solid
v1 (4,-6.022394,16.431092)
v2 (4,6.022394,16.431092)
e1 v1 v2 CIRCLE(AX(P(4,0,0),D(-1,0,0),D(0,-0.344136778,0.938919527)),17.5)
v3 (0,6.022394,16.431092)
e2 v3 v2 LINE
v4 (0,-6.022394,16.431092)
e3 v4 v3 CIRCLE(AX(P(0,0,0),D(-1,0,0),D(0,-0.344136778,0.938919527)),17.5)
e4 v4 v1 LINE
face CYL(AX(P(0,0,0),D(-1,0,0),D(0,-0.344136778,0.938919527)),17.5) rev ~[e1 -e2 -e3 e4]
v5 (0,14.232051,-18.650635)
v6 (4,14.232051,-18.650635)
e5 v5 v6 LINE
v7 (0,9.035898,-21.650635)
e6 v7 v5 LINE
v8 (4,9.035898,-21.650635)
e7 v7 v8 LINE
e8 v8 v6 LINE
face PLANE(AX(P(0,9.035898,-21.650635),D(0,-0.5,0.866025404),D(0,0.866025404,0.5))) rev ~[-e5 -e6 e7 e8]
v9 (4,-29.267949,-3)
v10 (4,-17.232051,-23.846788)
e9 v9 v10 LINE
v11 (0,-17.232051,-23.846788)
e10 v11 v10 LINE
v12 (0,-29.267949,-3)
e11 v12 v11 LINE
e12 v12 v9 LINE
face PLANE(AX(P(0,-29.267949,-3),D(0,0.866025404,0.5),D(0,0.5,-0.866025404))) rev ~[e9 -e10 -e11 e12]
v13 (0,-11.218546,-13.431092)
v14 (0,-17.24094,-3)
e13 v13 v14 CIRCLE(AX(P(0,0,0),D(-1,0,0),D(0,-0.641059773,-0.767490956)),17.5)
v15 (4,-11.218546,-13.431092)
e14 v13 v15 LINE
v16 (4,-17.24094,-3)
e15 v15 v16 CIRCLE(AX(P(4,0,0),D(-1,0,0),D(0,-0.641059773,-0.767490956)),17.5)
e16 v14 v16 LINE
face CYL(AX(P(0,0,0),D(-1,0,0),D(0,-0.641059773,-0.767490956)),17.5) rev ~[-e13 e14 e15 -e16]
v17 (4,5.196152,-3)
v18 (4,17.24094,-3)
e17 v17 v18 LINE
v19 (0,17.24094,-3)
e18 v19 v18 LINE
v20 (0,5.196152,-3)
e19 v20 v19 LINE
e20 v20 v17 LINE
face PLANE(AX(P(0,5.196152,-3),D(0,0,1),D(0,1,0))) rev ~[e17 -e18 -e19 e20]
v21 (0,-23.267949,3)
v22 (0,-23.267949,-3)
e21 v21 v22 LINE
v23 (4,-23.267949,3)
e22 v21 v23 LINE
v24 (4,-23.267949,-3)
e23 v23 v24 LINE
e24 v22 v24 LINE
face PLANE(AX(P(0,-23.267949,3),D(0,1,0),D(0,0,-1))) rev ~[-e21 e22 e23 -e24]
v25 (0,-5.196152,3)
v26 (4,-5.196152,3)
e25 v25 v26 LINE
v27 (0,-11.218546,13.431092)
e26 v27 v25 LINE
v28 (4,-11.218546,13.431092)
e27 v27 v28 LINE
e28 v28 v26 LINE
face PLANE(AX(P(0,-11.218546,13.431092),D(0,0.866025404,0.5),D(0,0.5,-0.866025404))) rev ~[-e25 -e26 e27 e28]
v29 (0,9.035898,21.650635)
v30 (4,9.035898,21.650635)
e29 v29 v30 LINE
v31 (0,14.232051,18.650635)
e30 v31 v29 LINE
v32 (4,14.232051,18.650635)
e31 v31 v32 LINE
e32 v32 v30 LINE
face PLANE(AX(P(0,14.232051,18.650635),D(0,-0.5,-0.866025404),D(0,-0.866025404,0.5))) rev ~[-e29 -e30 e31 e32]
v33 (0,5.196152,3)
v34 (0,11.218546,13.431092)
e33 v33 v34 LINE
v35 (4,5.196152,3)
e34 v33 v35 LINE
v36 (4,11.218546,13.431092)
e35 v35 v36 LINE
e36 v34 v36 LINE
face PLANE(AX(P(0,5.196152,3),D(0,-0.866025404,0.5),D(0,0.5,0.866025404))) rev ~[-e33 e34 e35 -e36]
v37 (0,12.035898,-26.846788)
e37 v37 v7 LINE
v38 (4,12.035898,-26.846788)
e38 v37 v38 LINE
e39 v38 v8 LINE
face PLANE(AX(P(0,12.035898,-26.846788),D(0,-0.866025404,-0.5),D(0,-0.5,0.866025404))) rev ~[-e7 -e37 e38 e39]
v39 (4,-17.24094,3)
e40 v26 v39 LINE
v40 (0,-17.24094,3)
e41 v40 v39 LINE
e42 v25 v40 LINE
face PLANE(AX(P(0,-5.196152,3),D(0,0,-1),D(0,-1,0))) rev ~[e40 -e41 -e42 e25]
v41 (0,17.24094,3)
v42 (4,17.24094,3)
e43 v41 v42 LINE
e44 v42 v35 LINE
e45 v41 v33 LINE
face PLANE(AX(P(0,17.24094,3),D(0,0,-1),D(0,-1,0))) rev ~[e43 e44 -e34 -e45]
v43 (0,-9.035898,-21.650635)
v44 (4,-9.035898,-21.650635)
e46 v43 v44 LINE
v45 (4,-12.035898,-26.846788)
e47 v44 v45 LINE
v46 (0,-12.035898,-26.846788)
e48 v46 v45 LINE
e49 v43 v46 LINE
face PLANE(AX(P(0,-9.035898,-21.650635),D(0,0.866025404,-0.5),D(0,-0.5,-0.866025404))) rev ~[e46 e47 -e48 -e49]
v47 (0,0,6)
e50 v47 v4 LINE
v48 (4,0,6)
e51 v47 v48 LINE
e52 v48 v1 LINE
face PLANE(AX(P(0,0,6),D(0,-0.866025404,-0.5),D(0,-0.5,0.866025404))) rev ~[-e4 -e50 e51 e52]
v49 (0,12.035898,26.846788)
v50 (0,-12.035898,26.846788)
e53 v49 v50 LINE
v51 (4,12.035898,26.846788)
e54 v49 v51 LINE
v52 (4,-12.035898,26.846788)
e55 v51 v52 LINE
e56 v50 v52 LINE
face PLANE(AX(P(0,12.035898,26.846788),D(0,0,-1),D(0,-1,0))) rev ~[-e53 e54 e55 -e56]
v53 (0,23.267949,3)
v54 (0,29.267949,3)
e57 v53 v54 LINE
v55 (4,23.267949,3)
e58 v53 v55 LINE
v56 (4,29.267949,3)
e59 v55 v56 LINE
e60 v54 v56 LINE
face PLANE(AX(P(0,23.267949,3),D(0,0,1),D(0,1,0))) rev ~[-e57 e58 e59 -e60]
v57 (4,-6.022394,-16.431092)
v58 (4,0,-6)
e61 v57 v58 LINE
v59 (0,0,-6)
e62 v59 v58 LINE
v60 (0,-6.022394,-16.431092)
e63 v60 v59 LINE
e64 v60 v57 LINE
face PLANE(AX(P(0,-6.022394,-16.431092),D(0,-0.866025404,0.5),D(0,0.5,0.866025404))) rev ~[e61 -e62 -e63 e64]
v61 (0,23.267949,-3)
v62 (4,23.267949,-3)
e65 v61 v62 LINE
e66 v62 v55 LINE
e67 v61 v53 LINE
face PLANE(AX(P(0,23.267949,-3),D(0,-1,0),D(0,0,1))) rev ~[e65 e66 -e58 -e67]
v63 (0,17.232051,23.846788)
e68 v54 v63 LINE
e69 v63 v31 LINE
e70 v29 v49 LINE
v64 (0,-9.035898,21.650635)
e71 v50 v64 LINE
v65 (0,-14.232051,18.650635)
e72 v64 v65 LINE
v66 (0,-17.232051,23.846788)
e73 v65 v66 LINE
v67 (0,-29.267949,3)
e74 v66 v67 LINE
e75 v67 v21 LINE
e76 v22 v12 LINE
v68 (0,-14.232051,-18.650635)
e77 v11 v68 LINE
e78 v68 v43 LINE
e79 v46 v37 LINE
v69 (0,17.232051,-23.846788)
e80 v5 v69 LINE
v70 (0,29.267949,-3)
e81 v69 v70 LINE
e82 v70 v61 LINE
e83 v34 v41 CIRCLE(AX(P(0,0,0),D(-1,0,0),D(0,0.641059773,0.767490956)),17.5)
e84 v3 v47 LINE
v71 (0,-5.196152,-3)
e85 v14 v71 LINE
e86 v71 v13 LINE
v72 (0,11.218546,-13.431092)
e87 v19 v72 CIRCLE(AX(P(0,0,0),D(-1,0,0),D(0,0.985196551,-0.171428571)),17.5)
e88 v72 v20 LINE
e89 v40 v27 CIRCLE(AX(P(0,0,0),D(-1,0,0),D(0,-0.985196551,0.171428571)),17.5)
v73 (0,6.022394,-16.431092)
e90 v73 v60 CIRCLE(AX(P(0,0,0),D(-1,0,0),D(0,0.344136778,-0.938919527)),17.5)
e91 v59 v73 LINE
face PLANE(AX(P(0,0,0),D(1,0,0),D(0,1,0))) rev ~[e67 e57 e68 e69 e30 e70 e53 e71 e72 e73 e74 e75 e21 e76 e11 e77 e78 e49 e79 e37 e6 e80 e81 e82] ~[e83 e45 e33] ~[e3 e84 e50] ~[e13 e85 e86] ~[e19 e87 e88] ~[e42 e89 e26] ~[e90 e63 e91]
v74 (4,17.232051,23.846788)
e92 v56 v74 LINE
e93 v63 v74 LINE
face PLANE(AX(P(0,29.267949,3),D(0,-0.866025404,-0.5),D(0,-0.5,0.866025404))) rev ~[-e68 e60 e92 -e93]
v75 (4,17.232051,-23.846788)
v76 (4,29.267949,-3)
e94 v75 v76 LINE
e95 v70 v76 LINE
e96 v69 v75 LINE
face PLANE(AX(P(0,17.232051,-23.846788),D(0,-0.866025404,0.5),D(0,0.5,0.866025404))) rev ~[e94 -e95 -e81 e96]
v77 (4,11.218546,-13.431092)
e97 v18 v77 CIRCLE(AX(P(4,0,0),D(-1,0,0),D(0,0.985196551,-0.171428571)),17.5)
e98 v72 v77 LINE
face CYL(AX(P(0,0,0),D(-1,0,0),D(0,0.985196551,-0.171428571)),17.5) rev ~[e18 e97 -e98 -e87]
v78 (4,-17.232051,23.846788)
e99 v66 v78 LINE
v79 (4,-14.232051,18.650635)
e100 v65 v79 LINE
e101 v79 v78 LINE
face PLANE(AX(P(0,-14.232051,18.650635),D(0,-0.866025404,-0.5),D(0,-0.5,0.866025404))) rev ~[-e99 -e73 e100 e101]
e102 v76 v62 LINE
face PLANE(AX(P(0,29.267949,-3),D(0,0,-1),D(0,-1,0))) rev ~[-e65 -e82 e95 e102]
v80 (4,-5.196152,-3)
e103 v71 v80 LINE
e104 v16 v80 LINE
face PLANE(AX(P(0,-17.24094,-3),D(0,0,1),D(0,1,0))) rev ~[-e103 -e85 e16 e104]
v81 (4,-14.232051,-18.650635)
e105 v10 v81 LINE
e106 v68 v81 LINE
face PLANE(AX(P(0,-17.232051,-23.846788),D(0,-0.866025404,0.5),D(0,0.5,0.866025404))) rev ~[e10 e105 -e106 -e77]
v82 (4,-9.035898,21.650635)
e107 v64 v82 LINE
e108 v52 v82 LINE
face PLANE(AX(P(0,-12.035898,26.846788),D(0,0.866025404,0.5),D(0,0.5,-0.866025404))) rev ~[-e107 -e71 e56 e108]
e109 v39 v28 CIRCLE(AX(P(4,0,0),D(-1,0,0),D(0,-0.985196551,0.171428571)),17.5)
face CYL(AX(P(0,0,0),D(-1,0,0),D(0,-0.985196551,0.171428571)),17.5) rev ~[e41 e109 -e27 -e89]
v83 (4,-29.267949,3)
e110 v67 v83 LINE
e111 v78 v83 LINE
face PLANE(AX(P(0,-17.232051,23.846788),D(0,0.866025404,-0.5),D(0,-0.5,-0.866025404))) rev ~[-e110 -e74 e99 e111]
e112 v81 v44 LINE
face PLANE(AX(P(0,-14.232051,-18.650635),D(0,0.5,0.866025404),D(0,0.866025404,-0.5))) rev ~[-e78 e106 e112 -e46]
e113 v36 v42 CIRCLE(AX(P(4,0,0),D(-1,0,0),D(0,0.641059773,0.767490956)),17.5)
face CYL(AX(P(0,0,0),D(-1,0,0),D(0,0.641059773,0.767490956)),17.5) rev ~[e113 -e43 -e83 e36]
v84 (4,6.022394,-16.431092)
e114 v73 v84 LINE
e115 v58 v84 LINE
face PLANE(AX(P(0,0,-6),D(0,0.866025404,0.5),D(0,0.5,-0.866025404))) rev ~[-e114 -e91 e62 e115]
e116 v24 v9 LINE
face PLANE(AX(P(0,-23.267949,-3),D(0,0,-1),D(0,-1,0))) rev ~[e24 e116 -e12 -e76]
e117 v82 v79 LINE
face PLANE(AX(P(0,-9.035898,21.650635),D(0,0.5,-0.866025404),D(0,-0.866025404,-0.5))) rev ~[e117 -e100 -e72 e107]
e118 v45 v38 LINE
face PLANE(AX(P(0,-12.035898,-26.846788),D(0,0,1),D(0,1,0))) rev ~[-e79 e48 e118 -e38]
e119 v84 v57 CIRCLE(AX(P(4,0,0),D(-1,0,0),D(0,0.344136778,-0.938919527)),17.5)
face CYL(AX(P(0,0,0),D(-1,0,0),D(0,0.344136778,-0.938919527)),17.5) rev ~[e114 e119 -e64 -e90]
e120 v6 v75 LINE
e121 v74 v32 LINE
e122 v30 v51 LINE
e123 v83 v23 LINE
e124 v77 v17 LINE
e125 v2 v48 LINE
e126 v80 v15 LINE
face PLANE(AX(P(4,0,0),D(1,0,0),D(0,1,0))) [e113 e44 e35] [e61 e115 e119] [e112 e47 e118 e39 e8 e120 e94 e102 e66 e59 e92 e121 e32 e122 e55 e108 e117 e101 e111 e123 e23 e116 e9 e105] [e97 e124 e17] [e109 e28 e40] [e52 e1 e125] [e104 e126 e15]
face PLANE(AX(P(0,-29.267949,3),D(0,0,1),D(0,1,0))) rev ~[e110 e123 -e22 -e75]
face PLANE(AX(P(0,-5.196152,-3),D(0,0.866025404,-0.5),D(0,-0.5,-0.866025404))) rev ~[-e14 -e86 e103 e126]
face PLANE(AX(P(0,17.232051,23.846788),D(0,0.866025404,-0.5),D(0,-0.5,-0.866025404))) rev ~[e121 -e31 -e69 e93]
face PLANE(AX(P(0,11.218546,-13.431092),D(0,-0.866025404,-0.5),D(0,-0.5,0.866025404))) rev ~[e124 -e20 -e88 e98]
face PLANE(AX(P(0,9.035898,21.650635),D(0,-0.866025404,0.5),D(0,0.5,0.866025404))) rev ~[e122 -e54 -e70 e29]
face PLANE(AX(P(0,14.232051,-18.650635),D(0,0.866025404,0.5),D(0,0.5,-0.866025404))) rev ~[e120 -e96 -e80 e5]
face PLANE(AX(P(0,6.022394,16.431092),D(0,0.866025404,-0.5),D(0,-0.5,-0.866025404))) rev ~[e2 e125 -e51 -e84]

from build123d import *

# Parameters (mm, degrees)
F1_DEPTH = 4


with BuildPart() as f1:
    # F0 (on Right) → F1 (new body)
    with BuildSketch(Plane.YZ):
        Polygon((17.2320508076, -23.8467875173), (29.2679491924, -3), (23.2679491924, -3), (23.2679491924, 3), (29.2679491924, 3), (17.2320508076, 23.8467875173), (14.2320508076, 18.6506350946), (9.0358983849, 21.6506350946), (12.0358983849, 26.8467875173), (-12.0358983849, 26.8467875173), (-9.0358983849, 21.6506350946), (-14.2320508076, 18.6506350946), (-17.2320508076, 23.8467875173), (-29.2679491924, 3), (-23.2679491924, 3), (-23.2679491924, -3), (-29.2679491924, -3), (-17.2320508076, -23.8467875173), (-14.2320508076, -18.6506350946), (-9.0358983849, -21.6506350946), (-12.0358983849, -26.8467875173), (12.0358983849, -26.8467875173), (9.0358983849, -21.6506350946), (14.2320508076, -18.6506350946), align=None)
        with BuildLine():
            ThreePointArc((17.2409396496, 3), (17.4351146235, 1.5055823014), (17.5, 0))
            ThreePointArc((17.5, 0), (17.4351146235, -1.5055823014), (17.2409396496, -3))
            ThreePointArc((17.2409396496, -3), (15.1554445662, -8.75), (11.2185460361, -13.4310917216))
            ThreePointArc((11.2185460361, -13.4310917216), (8.75, -15.1554445662), (6.0223936134, -16.4310917216))
            ThreePointArc((6.0223936134, -16.4310917216), (0, -17.5), (-6.0223936134, -16.4310917216))
            ThreePointArc((-6.0223936134, -16.4310917216), (-8.75, -15.1554445662), (-11.2185460361, -13.4310917216))
            ThreePointArc((-11.2185460361, -13.4310917216), (-15.1554445662, -8.75), (-17.2409396496, -3))
            ThreePointArc((-17.2409396496, -3), (-17.5, 0), (-17.2409396496, 3))
            ThreePointArc((-17.2409396496, 3), (-15.1554445662, 8.75), (-11.2185460361, 13.4310917216))
            ThreePointArc((-11.2185460361, 13.4310917216), (-8.75, 15.1554445662), (-6.0223936134, 16.4310917216))
            ThreePointArc((-6.0223936134, 16.4310917216), (0, 17.5), (6.0223936134, 16.4310917216))
            ThreePointArc((6.0223936134, 16.4310917216), (8.75, 15.1554445662), (11.2185460361, 13.4310917216))
            ThreePointArc((11.2185460361, 13.4310917216), (15.1554445662, 8.75), (17.2409396496, 3))
        make_face(mode=Mode.SUBTRACT)
        with BuildLine():
            ThreePointArc((17.2409396496, -3), (17.4351146235, -1.5055823014), (17.5, 0))
            ThreePointArc((17.5, 0), (17.4351146235, 1.5055823014), (17.2409396496, 3))
            Line((17.2409396496, 3), (5.1961524227, 3))
            Line((5.1961524227, 3), (3.4641016151, 0))
            Line((3.4641016151, 0), (5.1961524227, -3))
            Line((5.1961524227, -3), (17.2409396496, -3))
        make_face()
        with BuildLine():
            Line((5.1961524227, 3), (11.2185460361, 13.4310917216))
            ThreePointArc((11.2185460361, 13.4310917216), (8.75, 15.1554445662), (6.0223936134, 16.4310917216))
            Line((6.0223936134, 16.4310917216), (0, 6))
            Line((0, 6), (1.7320508076, 3))
            Line((1.7320508076, 3), (5.1961524227, 3))
        make_face()
        Polygon((3.4641016151, 0), (5.1961524227, 3), (1.7320508076, 3), align=None)
        with BuildLine():
            ThreePointArc((6.0223936134, -16.4310917216), (8.75, -15.1554445662), (11.2185460361, -13.4310917216))
            Line((11.2185460361, -13.4310917216), (5.1961524227, -3))
            Line((5.1961524227, -3), (1.7320508076, -3))
            Line((1.7320508076, -3), (0, -6))
            Line((0, -6), (6.0223936134, -16.4310917216))
        make_face()
        Polygon((1.7320508076, -3), (5.1961524227, -3), (3.4641016151, 0), align=None)
        Polygon((-1.7320508076, 3), (1.7320508076, 3), (0, 6), align=None)
        Polygon((3.4641016151, 0), (1.7320508076, 3), (-1.7320508076, 3), (-3.4641016151, 0), (-1.7320508076, -3), (1.7320508076, -3), align=None)
        Polygon((0, -6), (1.7320508076, -3), (-1.7320508076, -3), align=None)
        with BuildLine():
            Line((0, 6), (-6.0223936134, 16.4310917216))
            ThreePointArc((-6.0223936134, 16.4310917216), (-8.75, 15.1554445662), (-11.2185460361, 13.4310917216))
            Line((-11.2185460361, 13.4310917216), (-5.1961524227, 3))
            Line((-5.1961524227, 3), (-1.7320508076, 3))
            Line((-1.7320508076, 3), (0, 6))
        make_face()
        Polygon((-3.4641016151, 0), (-1.7320508076, 3), (-5.1961524227, 3), align=None)
        with BuildLine():
            ThreePointArc((-11.2185460361, -13.4310917216), (-8.75, -15.1554445662), (-6.0223936134, -16.4310917216))
            Line((-6.0223936134, -16.4310917216), (0, -6))
            Line((0, -6), (-1.7320508076, -3))
            Line((-1.7320508076, -3), (-5.1961524227, -3))
            Line((-5.1961524227, -3), (-11.2185460361, -13.4310917216))
        make_face()
        Polygon((-5.1961524227, -3), (-1.7320508076, -3), (-3.4641016151, 0), align=None)
        with BuildLine():
            Line((-3.4641016151, 0), (-5.1961524227, 3))
            Line((-5.1961524227, 3), (-17.2409396496, 3))
            ThreePointArc((-17.2409396496, 3), (-17.5, 0), (-17.2409396496, -3))
            Line((-17.2409396496, -3), (-5.1961524227, -3))
            Line((-5.1961524227, -3), (-3.4641016151, 0))
        make_face()
    extrude(amount=F1_DEPTH)


solid = f1.part
